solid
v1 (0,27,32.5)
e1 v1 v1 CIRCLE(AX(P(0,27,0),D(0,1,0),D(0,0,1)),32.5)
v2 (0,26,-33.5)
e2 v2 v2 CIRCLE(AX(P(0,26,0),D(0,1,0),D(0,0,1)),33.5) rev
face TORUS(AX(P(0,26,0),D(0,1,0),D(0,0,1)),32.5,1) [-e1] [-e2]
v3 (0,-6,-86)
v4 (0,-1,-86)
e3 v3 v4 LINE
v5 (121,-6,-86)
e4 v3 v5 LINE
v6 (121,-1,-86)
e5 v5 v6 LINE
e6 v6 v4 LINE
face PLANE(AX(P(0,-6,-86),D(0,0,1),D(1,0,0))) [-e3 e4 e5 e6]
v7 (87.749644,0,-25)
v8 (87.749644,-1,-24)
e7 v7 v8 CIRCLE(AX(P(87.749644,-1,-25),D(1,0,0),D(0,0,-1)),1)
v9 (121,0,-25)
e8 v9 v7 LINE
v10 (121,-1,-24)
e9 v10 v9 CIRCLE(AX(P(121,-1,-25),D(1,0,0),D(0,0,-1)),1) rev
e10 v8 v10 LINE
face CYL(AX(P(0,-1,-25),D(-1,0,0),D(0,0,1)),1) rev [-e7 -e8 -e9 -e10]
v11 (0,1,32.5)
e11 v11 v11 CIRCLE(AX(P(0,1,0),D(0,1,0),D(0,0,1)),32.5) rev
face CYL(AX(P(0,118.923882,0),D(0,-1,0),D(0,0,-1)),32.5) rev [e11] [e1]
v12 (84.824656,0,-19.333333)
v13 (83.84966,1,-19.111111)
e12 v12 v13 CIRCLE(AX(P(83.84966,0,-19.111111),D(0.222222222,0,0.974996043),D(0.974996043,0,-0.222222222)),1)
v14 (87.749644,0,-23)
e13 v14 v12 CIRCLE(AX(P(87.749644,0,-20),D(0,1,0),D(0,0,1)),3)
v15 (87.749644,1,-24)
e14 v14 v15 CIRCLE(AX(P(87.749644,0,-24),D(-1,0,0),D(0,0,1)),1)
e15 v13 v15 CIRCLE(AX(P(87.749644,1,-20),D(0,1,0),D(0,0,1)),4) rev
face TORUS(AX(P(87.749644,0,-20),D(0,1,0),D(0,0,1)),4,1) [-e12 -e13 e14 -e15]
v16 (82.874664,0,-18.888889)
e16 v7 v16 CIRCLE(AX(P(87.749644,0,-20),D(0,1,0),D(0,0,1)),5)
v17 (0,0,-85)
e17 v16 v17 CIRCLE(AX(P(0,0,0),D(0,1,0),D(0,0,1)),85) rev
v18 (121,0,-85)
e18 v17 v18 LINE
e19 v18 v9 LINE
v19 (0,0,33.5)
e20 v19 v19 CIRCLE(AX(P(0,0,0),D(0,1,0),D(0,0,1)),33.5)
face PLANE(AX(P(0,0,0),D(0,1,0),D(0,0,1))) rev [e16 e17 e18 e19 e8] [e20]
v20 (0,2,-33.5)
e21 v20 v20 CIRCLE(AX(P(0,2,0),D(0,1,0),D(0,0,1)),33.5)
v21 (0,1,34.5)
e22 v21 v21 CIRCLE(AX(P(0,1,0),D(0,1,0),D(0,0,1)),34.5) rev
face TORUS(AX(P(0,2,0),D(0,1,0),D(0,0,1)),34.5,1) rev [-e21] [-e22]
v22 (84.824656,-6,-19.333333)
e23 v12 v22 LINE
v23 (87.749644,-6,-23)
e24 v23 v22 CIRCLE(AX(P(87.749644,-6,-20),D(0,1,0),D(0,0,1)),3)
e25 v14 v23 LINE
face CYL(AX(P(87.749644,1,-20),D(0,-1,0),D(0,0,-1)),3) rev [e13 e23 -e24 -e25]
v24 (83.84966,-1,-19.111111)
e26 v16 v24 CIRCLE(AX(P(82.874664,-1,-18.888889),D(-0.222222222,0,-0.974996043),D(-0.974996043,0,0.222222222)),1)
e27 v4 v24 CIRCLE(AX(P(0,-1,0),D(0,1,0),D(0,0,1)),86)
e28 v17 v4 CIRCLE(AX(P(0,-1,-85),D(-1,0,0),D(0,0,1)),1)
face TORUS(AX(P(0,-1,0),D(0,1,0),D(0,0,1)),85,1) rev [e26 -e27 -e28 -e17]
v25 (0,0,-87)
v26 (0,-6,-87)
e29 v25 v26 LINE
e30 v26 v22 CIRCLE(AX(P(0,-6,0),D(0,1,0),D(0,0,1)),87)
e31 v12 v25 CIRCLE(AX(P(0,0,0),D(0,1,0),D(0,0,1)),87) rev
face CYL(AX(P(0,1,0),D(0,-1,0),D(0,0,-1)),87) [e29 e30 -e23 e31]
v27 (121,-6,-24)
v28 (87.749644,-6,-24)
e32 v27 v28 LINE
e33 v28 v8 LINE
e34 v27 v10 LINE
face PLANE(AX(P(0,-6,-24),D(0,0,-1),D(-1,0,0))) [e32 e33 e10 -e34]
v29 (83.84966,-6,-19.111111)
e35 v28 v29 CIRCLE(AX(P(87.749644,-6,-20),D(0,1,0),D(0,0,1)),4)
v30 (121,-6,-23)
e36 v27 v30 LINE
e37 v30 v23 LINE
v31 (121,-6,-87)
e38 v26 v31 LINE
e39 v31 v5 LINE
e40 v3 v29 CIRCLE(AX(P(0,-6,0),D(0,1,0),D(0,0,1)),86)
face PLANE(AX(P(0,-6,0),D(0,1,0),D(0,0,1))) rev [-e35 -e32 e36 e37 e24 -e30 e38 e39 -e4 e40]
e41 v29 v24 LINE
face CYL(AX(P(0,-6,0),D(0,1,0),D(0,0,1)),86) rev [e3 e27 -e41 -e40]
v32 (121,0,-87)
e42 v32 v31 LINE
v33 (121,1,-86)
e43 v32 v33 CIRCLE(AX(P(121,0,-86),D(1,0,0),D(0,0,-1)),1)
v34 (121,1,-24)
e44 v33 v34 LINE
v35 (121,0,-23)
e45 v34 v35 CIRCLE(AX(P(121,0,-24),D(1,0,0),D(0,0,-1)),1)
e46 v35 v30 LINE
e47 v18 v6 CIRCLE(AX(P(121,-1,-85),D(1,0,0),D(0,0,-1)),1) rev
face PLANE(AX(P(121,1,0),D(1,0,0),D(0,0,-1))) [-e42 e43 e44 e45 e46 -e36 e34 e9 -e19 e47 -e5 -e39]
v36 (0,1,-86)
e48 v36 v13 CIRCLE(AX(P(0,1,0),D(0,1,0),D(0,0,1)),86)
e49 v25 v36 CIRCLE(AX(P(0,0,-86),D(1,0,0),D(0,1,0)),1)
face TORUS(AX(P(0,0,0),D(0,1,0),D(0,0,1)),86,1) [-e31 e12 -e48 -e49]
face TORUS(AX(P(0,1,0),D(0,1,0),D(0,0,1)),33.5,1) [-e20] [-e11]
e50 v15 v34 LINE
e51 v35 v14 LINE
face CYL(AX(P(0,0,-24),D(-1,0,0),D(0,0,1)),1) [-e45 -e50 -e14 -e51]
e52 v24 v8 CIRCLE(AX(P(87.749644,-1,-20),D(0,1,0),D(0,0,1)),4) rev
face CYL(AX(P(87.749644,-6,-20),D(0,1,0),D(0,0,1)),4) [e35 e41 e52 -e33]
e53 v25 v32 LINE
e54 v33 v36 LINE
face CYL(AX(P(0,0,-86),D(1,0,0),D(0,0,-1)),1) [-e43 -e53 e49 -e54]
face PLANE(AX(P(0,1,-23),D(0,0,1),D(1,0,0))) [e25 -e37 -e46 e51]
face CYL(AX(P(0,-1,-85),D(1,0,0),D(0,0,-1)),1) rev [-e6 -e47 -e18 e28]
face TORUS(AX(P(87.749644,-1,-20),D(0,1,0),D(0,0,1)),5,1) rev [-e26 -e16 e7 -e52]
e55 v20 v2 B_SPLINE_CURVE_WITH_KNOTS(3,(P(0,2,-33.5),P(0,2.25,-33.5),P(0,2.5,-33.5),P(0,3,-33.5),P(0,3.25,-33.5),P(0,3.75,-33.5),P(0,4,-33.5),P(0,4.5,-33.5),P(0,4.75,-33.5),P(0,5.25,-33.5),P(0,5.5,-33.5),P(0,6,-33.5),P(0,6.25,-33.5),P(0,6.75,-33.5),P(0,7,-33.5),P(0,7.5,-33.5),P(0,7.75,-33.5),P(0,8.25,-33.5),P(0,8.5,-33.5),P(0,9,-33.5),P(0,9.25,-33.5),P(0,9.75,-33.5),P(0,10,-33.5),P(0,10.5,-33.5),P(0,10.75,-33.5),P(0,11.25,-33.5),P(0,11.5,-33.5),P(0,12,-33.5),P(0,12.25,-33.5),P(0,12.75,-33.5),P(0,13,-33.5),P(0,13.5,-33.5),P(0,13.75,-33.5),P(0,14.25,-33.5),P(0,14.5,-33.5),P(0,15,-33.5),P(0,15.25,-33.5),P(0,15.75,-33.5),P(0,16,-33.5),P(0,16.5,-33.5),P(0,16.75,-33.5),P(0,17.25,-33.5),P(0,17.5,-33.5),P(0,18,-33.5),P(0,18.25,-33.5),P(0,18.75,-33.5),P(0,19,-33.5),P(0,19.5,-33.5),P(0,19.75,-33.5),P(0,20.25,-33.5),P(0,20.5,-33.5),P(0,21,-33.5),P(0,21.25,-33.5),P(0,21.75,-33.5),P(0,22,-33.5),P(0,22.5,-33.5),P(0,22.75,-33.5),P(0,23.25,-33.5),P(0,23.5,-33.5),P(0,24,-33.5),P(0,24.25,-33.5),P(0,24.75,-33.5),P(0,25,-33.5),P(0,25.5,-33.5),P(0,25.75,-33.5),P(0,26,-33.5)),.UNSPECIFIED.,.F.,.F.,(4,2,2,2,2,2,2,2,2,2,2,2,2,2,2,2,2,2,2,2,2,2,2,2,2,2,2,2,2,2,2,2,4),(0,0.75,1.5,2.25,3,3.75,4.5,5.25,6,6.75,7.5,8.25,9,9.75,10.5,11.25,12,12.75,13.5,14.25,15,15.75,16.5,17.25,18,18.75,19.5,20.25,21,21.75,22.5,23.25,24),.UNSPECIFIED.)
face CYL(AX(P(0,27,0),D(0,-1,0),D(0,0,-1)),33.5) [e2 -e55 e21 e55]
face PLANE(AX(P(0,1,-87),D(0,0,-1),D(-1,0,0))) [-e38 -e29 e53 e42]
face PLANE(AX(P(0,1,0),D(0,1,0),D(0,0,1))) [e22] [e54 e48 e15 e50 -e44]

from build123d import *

# Parameters (mm, degrees)
BOSS_EXTRUDE1_DEPTH = 1
BOSS_EXTRUDE2_START = -6
BOSS_EXTRUDE2_DEPTH = 6
SKETCH4_R           = 33.5
SKETCH4_R_2         = 32.5
BOSS_EXTRUDE3_DEPTH = 26
CUT_EXTRUDE3_START  = -1
SKETCH4_4_R         = 32.5
CUT_EXTRUDE3_DEPTH  = 27
FILLET2_R           = 1


with BuildPart() as part:
    # Sketch1 → Boss-Extrude1 (new body)
    with BuildSketch(Plane(origin=(0, 0, 0), x_dir=(1, 0, 0), z_dir=(0, 1, 0))):
        with BuildLine():
            Line((121, 23), (121, 87))
            Line((121, 87), (0, 87))
            ThreePointArc((0, 87), (-54.254032108, -68.011028517), (84.824655745, 19.333333333))
            ThreePointArc((84.824655745, 19.333333333), (85.404435994, 21.870828693), (87.749643874, 23))
            Line((87.749643874, 23), (121, 23))
        make_face()
    extrude(amount=BOSS_EXTRUDE1_DEPTH)

    # Sketch1<3> → Boss-Extrude2 (add)
    with BuildSketch(Plane(origin=(0, 0, 0), x_dir=(1, 0, 0), z_dir=(0, 1, 0)).offset(BOSS_EXTRUDE2_START)):
        with BuildLine():
            Line((121, 23), (121, 24))
            Line((121, 24), (87.749643874, 24))
            ThreePointArc((87.749643874, 24), (84.622700034, 22.494438258), (83.849659702, 19.111111111))
            ThreePointArc((83.849659702, 19.111111111), (-53.630422544, -67.229292557), (0, 86))
            Line((0, 86), (121, 86))
            Line((121, 86), (121, 87))
            Line((121, 87), (0, 87))
            ThreePointArc((0, 87), (-54.254032108, -68.011028517), (84.824655745, 19.333333333))
            ThreePointArc((84.824655745, 19.333333333), (85.404435994, 21.870828693), (87.749643874, 23))
            Line((87.749643874, 23), (121, 23))
        make_face()
    extrude(amount=BOSS_EXTRUDE2_DEPTH)

    # Sketch4 → Boss-Extrude3 (add)
    # profile 1 of 2: a face of its own
    with BuildSketch(Plane(origin=(0, 1, 0), x_dir=(1, 0, 0), z_dir=(0, 1, 0))):
        with Locations(Location((0, 0, 0), (0, 0, 90))):
            Circle(SKETCH4_R)
        Circle(SKETCH4_R_2, mode=Mode.SUBTRACT)
    # profile 2 of 2: a face of its own
    with BuildSketch(Plane(origin=(0, 1, 0), x_dir=(1, 0, 0), z_dir=(0, 1, 0))):
        Circle(SKETCH4_R_2)
    extrude(amount=BOSS_EXTRUDE3_DEPTH)

    # Sketch4<4> → Cut-Extrude3 (cut)
    with BuildSketch(Plane(origin=(0, 1, 0), x_dir=(1, 0, 0), z_dir=(0, 1, 0)).offset(CUT_EXTRUDE3_START)):
        with Locations(Location((0, 0, 0), (0, 0, 270))):
            Circle(SKETCH4_4_R)
    extrude(amount=CUT_EXTRUDE3_DEPTH, mode=Mode.SUBTRACT)

    # Fillet2
    fillet2_edges = [part.edges().sort_by_distance(p)[0] for p in [
        (60.5, 1, -87),
        (-54.254032108, 1, 68.011028517),
        (-53.630422544, 0, 67.229292557),
        (85.404435994, 1, -21.870828693),
        (104.374821937, 0, -24),
        (84.622700034, 0, -22.494438258),
        (60.5, 0, -86),
        (104.374821937, 1, -23),
        (0, 1, 33.5),
        (0, 27, 33.5),
        (0, 0, -32.5),
    ]]
    fillet(fillet2_edges, radius=FILLET2_R - 0.0001)  # a hair under: the kernel refuses the full size


solid = part.part
